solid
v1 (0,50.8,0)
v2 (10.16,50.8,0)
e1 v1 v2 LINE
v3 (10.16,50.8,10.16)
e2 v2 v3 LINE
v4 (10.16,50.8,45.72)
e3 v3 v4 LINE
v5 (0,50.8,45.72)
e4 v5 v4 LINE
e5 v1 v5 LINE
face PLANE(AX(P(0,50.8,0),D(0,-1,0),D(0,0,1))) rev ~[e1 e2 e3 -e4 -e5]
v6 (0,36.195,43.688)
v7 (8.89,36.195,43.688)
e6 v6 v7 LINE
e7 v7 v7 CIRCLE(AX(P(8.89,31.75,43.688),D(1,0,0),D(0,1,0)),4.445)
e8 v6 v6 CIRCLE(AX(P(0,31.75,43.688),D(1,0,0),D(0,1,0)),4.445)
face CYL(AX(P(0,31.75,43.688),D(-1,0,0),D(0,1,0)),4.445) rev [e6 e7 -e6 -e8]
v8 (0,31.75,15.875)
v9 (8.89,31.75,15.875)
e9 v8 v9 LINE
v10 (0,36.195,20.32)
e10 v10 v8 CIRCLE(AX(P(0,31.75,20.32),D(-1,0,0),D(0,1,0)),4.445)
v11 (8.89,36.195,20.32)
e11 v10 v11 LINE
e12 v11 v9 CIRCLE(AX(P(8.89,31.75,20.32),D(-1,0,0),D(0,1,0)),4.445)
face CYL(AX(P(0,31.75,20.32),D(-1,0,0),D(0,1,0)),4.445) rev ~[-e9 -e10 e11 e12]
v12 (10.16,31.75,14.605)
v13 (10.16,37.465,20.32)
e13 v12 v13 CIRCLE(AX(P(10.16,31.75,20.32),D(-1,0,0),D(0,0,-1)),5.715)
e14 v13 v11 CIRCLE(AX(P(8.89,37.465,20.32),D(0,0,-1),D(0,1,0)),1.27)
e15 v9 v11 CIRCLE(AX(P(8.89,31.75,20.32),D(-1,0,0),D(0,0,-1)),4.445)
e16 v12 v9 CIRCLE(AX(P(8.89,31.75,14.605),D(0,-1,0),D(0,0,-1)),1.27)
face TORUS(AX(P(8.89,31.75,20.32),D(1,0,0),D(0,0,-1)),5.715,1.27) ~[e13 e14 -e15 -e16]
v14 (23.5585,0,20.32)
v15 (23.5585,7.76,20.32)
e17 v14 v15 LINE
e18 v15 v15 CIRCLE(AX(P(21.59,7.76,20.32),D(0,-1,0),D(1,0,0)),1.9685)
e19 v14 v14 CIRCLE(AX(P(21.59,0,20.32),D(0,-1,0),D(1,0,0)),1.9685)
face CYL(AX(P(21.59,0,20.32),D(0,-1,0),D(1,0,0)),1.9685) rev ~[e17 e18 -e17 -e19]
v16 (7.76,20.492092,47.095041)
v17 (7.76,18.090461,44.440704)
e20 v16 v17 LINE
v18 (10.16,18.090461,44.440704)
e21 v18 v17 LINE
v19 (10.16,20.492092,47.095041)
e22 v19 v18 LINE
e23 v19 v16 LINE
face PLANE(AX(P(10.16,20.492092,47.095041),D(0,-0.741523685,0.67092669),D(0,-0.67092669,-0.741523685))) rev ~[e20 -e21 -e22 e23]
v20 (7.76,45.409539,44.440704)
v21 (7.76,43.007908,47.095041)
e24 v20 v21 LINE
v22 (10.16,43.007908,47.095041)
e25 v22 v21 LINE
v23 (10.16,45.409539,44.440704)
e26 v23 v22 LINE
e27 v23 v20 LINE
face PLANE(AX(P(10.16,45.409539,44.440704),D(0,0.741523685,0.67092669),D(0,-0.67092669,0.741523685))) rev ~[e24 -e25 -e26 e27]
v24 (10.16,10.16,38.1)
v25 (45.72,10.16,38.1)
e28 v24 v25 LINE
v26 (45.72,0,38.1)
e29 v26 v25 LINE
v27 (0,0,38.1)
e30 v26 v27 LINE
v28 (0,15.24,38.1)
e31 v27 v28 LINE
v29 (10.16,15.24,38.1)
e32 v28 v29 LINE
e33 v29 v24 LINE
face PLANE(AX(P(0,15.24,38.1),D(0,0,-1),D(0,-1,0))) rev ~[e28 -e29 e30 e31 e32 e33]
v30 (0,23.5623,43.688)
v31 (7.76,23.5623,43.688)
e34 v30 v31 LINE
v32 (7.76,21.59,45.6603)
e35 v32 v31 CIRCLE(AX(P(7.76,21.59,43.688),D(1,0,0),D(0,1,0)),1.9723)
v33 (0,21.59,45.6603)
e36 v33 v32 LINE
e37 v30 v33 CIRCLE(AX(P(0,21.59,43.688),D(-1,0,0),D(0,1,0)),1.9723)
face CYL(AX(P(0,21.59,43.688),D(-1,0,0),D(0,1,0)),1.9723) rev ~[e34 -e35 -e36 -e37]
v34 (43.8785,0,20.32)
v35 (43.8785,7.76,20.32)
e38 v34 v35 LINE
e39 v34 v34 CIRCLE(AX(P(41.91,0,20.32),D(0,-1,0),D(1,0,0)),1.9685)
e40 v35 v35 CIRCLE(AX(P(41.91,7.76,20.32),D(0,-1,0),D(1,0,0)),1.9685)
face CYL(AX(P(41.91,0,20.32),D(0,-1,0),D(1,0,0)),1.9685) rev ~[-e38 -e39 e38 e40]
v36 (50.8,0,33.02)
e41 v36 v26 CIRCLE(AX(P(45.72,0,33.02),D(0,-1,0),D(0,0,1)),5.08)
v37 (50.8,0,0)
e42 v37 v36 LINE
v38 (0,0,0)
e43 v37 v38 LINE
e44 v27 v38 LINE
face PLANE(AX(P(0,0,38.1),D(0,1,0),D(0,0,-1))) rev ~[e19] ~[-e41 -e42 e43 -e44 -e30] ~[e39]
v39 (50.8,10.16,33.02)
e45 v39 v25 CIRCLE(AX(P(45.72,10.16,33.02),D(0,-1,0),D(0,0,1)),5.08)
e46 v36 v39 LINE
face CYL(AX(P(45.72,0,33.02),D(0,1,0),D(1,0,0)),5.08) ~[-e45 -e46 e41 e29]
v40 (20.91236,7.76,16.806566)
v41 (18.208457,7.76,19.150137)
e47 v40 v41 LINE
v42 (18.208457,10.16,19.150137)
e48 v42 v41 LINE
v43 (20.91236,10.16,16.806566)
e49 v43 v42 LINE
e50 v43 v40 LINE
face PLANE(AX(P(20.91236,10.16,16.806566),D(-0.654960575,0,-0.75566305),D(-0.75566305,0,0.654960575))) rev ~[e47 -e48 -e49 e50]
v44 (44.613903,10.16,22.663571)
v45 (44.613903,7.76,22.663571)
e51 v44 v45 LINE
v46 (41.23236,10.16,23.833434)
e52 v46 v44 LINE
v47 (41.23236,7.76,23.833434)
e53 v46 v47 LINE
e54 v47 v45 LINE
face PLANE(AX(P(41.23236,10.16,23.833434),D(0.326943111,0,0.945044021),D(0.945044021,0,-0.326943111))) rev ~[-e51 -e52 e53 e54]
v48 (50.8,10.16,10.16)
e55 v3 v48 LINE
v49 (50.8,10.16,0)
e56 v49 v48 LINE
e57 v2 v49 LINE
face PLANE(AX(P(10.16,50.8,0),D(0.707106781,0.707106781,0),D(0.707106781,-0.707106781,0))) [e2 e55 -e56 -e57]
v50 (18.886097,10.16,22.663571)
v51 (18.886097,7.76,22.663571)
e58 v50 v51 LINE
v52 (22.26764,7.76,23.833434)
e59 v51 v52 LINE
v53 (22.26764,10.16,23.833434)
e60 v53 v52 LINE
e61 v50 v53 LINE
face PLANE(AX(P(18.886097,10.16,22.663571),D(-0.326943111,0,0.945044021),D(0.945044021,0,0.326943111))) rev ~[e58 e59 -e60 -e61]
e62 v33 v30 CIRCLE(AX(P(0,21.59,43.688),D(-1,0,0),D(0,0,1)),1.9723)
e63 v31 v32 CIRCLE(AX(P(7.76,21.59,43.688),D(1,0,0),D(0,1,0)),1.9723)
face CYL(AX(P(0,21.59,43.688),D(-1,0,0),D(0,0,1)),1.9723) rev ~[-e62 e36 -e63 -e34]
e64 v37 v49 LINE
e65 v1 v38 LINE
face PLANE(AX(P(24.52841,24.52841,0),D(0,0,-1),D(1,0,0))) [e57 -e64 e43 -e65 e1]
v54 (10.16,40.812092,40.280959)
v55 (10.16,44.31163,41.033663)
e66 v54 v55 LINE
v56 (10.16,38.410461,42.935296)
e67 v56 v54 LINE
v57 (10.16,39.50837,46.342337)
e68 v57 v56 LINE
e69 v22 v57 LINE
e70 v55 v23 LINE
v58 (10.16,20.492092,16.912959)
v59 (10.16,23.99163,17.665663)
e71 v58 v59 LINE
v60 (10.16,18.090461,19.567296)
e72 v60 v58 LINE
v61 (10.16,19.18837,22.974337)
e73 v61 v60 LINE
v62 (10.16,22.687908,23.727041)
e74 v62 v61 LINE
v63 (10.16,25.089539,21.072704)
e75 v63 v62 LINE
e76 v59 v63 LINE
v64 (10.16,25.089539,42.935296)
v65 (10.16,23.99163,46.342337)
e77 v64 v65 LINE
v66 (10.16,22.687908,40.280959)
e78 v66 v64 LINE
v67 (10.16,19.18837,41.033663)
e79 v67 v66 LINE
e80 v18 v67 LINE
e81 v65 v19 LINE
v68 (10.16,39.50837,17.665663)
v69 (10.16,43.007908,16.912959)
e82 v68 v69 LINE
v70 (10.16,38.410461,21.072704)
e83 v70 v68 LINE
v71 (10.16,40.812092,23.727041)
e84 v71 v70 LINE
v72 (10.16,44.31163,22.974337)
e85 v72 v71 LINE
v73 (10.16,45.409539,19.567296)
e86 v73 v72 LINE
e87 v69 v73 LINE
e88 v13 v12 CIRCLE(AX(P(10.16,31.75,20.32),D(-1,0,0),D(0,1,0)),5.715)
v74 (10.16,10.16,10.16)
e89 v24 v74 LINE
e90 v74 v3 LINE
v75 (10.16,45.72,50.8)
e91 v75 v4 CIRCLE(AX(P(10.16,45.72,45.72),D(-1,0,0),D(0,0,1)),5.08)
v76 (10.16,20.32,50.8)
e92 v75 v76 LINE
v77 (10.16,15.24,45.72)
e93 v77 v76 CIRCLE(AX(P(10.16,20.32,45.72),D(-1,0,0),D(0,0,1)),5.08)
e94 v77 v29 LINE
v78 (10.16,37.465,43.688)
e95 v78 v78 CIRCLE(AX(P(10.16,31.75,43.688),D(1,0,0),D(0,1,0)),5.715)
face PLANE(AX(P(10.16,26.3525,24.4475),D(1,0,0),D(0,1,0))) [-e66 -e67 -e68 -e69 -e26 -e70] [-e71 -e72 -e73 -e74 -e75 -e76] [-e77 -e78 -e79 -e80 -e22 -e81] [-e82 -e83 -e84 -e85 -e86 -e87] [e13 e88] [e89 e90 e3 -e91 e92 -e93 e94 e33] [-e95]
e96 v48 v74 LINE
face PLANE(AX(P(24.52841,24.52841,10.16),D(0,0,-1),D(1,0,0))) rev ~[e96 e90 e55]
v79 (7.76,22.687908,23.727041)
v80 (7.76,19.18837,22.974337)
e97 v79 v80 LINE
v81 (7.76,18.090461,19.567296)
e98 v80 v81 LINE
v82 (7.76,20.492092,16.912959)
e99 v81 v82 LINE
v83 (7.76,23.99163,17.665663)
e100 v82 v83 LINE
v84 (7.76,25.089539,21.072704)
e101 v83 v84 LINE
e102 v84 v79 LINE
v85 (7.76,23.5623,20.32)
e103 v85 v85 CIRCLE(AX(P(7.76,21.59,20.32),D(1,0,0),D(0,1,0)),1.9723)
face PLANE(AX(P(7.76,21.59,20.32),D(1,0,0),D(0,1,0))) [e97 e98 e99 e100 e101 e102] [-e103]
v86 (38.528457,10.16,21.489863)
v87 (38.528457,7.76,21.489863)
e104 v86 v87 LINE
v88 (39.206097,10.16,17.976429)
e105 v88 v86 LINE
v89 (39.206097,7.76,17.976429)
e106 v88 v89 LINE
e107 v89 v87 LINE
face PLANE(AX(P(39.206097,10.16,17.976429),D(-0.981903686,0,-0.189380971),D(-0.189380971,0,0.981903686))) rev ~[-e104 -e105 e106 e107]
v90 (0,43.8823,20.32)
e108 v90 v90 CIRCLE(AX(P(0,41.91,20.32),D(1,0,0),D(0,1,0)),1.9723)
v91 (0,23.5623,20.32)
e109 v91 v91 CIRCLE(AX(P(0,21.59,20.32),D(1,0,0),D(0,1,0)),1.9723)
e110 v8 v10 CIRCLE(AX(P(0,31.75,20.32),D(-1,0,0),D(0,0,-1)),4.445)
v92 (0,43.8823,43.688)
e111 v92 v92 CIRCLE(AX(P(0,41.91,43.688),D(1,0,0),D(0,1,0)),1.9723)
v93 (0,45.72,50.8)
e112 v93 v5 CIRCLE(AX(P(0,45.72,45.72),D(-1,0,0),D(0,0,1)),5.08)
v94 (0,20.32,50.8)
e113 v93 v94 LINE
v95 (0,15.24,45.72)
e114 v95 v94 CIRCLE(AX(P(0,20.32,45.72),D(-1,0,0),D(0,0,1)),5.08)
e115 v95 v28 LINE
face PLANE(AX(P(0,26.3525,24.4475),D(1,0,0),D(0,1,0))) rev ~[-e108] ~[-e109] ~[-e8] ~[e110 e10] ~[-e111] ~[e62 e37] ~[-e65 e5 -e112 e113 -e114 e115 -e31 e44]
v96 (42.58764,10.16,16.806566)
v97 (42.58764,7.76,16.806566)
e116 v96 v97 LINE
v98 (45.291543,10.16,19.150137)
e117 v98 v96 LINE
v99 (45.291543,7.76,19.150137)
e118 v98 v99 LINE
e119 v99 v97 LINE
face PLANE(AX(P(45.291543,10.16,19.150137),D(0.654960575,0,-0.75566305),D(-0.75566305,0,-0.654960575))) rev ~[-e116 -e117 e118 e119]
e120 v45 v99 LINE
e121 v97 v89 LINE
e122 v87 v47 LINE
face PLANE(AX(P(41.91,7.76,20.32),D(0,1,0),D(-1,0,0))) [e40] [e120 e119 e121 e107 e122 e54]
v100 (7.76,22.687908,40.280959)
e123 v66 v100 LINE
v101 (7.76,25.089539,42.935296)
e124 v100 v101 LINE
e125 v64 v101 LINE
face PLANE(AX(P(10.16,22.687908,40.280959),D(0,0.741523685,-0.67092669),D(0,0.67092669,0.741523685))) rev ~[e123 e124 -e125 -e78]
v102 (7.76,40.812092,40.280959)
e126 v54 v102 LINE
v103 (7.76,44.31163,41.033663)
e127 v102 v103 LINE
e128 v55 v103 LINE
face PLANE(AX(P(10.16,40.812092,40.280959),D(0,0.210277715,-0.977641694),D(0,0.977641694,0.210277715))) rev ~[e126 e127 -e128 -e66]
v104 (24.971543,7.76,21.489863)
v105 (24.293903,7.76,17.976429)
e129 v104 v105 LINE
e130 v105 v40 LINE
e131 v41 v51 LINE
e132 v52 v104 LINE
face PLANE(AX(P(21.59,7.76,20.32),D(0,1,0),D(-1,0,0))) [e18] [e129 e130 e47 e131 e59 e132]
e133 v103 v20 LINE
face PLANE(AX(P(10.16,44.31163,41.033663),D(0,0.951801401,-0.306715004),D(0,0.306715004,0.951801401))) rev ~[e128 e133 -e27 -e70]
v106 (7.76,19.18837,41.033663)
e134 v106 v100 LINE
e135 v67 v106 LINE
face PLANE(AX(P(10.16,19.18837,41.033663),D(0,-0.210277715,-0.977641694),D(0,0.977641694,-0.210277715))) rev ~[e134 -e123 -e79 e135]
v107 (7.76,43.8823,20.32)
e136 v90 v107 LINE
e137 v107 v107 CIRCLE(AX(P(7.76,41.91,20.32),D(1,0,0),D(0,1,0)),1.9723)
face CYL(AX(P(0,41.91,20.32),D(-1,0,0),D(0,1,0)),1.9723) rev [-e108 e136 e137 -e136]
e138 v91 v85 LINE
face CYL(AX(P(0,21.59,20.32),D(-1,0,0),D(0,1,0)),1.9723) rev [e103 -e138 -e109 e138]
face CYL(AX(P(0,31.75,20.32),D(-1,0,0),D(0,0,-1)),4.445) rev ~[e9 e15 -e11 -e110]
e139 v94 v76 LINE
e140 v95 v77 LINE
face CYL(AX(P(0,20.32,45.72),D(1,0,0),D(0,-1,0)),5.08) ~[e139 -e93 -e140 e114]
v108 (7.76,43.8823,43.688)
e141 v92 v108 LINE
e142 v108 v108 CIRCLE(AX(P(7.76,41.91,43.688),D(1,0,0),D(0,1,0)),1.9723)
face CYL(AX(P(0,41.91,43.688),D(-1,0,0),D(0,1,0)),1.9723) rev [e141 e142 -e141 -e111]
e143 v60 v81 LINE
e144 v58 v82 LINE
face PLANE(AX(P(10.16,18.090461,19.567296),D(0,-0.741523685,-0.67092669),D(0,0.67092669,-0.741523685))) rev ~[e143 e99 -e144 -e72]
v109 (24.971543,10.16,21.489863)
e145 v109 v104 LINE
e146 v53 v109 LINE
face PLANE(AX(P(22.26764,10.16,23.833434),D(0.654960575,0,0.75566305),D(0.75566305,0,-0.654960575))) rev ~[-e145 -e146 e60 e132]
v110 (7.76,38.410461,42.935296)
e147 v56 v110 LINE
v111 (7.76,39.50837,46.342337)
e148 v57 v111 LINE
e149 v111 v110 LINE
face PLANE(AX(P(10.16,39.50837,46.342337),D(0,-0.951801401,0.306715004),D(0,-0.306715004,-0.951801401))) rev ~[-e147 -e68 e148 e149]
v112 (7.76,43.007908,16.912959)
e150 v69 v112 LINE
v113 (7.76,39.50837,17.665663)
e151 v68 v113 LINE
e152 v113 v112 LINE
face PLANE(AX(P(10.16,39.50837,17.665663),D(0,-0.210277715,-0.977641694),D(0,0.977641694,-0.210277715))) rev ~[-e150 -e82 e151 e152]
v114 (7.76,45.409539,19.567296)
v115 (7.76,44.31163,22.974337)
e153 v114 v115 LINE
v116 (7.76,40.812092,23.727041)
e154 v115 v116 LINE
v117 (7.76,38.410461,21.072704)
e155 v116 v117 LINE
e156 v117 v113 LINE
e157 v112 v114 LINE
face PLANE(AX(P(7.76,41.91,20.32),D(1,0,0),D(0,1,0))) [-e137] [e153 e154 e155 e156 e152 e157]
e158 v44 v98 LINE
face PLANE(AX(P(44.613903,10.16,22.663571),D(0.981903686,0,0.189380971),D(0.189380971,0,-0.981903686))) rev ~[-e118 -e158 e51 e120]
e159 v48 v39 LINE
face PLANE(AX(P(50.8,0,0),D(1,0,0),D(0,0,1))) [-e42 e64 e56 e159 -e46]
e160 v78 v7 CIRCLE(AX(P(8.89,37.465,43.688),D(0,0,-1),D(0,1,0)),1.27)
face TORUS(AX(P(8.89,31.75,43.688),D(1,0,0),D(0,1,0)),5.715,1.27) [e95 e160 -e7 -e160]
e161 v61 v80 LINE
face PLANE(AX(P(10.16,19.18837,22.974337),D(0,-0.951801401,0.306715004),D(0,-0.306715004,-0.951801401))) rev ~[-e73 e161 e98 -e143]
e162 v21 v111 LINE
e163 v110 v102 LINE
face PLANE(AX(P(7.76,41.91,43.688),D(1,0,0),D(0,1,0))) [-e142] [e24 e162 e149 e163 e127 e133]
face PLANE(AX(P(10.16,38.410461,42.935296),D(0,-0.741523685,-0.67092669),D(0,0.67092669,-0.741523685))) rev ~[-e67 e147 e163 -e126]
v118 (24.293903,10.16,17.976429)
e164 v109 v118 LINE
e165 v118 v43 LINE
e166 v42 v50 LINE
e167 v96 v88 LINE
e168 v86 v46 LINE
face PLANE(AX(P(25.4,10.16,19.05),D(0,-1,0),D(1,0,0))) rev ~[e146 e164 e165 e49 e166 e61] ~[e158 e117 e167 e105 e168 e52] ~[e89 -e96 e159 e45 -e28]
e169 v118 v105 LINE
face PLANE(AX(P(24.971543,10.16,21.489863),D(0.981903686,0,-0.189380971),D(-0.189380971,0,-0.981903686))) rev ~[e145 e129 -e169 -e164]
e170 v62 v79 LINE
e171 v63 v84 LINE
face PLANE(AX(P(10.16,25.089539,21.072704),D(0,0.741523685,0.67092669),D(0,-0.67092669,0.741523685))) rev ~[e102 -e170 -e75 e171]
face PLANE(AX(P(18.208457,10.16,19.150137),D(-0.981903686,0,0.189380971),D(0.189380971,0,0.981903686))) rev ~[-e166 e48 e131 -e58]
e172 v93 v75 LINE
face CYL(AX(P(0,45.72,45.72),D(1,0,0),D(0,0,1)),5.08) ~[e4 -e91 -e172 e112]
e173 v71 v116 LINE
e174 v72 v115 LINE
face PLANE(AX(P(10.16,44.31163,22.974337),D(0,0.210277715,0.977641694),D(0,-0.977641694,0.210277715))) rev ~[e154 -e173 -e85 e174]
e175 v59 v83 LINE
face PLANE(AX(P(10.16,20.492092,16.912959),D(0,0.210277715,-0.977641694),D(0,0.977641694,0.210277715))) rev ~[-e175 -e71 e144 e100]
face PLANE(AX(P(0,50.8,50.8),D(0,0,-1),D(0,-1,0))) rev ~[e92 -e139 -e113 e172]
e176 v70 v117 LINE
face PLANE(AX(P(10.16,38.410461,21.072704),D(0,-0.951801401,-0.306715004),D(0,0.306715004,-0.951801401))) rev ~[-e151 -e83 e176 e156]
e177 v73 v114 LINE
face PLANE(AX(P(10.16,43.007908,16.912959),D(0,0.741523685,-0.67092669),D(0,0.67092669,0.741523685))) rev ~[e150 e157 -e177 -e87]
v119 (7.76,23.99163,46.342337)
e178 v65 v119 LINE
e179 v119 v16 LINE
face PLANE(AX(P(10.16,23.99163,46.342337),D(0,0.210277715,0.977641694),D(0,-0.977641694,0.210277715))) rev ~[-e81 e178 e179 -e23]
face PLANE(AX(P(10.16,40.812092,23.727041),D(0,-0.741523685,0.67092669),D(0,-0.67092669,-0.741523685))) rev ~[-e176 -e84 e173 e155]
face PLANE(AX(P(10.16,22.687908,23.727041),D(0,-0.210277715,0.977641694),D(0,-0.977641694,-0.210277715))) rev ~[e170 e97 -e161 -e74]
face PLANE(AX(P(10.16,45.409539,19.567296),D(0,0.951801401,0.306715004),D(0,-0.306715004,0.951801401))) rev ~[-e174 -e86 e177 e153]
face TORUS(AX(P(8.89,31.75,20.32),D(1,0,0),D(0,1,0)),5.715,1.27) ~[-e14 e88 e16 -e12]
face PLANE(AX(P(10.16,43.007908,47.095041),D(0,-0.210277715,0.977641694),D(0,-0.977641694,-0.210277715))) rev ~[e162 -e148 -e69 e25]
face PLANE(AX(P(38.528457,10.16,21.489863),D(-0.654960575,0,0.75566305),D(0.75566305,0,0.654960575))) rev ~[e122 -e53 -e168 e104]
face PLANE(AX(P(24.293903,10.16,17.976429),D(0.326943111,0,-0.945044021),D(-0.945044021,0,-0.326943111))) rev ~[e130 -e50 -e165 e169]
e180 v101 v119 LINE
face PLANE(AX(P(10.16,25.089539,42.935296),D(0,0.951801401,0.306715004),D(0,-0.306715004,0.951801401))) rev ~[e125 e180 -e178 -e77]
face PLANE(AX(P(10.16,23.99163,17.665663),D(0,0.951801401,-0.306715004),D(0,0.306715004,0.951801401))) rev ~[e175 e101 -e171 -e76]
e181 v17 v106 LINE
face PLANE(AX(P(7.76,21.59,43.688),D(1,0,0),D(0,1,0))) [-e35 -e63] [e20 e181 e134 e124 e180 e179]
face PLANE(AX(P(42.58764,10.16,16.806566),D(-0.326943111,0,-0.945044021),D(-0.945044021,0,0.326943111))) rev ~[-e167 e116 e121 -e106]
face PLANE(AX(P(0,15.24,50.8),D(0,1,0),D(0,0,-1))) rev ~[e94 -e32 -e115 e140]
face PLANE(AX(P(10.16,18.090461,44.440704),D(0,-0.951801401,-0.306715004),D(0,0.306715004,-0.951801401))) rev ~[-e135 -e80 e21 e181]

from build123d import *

# Parameters (mm, degrees)
F0_R      = 1.9722998741
F0_R_2    = 4.445
F1_DEPTH  = 10.16
F2_R      = 1.9722998741
F3_DEPTH  = 2.4
F4_R      = 5.08
F5_W      = 50.8
F5_H      = 38.1
F5_R      = 1.9685
F6_DEPTH  = 10.16
F7_R      = 5.08
F8_R      = 1.9685
F9_DEPTH  = 2.4
F11_DEPTH = 10.16
F12_R     = 1.27


# Not quite as in the source:
# - a feature names something its author has since deleted; it is built from what else it names


with BuildPart() as f1:
    # F0 (on Right) → F1 (new body)
    with BuildSketch(Plane.YZ):
        Polygon((15.24, 38.1), (0, 38.1), (0, 0), (31.75, 0), (50.8, 0), (50.8, 50.8), (31.75, 50.8), (21.59, 50.8), (15.24, 50.8), align=None)
        with Locations((21.59, 20.32)):
            Circle(F0_R, mode=Mode.SUBTRACT)
        with BuildLine():
            ThreePointArc((36.195, 20.32), (34.8930896424, 17.1769103576), (31.75, 15.875))
            ThreePointArc((31.75, 15.875), (28.6069103576, 23.4630896424), (36.195, 20.32))
        make_face(mode=Mode.SUBTRACT)
        with Locations((41.91, 20.32)):
            Circle(F0_R, mode=Mode.SUBTRACT)
        with BuildLine():
            ThreePointArc((23.5622998741, 43.688), (20.1953733845, 42.2933733845), (21.59, 45.6602998741))
            ThreePointArc((21.59, 45.6602998741), (22.9846266155, 45.0826266155), (23.5622998741, 43.688))
        make_face(mode=Mode.SUBTRACT)
        with Locations((31.75, 43.688)):
            Circle(F0_R_2, mode=Mode.SUBTRACT)
        with Locations((41.91, 43.688)):
            Circle(F0_R, mode=Mode.SUBTRACT)
    extrude(amount=F1_DEPTH)

    # F2 (on face) → F3 (cut)
    with BuildSketch(Plane.YZ.offset(10.16)):
        Polygon((20.4920916615, 47.0950413284), (18.0904614886, 44.440704152), (19.1883698271, 41.0336628236), (22.6879083385, 40.2809586716), (25.0895385114, 42.935295848), (23.9916301729, 46.3423371764), align=None)
        with Locations((21.59, 43.688)):
            Circle(F2_R, mode=Mode.SUBTRACT)
        Polygon((40.8120916615, 40.2809586716), (44.3116301729, 41.0336628236), (45.4095385114, 44.440704152), (43.0079083385, 47.0950413284), (39.5083698271, 46.3423371764), (38.4104614886, 42.935295848), align=None)
        with Locations((41.91, 43.688)):
            Circle(F2_R, mode=Mode.SUBTRACT)
        Polygon((44.3116301729, 22.9743371764), (40.8120916615, 23.7270413284), (38.4104614886, 21.072704152), (39.5083698271, 17.6656628236), (43.0079083385, 16.9129586716), (45.4095385114, 19.567295848), align=None)
        with Locations((41.91, 20.32)):
            Circle(F2_R, mode=Mode.SUBTRACT)
        Polygon((22.6879083385, 23.7270413284), (19.1883698271, 22.9743371764), (18.0904614886, 19.567295848), (20.4920916615, 16.9129586716), (23.9916301729, 17.6656628236), (25.0895385114, 21.072704152), align=None)
        with Locations((21.59, 20.32)):
            Circle(F2_R, mode=Mode.SUBTRACT)
    extrude(amount=-F3_DEPTH, mode=Mode.SUBTRACT)

    # F4
    f4_edges = [f1.edges().sort_by_distance(p)[0] for p in [
        (5.08, 50.8, 50.8),
        (5.08, 15.24, 50.8),
    ]]
    fillet(f4_edges, radius=F4_R)

    # F5 (on Front) → F6 (join)
    with BuildSketch(Plane.XZ):
        with Locations((25.4, 19.05)):
            Rectangle(F5_W, F5_H)
        with Locations((21.59, 20.32)):
            Circle(F5_R, mode=Mode.SUBTRACT)
        with Locations((41.91, 20.32)):
            Circle(F5_R, mode=Mode.SUBTRACT)
    extrude(amount=-F6_DEPTH)

    # F7
    f7_edges = [f1.edges().sort_by_distance(p)[0] for p in [
        (50.8, 5.08, 38.1),
    ]]
    fillet(f7_edges, radius=F7_R)

    # F8 (on face) → F9 (cut)
    with BuildSketch(Plane(origin=(0, 10.16, 0), x_dir=(-1, 0, 0), z_dir=(0, 1, 0))):
        Polygon((-41.2323596559, 23.8334340491), (-44.613902969, 22.6635707772), (-45.2915433131, 19.1501367281), (-42.5876403441, 16.8065659509), (-39.206097031, 17.9764292228), (-38.5284566869, 21.4898632719), align=None)
        with Locations((-41.91, 20.32)):
            Circle(F8_R, mode=Mode.SUBTRACT)
        Polygon((-24.293902969, 17.9764292228), (-20.9123596559, 16.8065659509), (-18.2084566869, 19.1501367281), (-18.886097031, 22.6635707772), (-22.2676403441, 23.8334340491), (-24.9715433131, 21.4898632719), align=None)
        with Locations((-21.59, 20.32)):
            Circle(F8_R, mode=Mode.SUBTRACT)
    extrude(amount=-F9_DEPTH, mode=Mode.SUBTRACT)

    # F10 (on face) → F11 (join)
    with BuildSketch(Plane(origin=(0, 0, 0), x_dir=(1, 0, 0), z_dir=(0, 0, -1))):
        Polygon((10.16, -10.16), (10.16, -50.8), (50.8, -10.16), align=None)
    extrude(amount=-F11_DEPTH)

    # F12
    f12_edges = [f1.edges().sort_by_distance(p)[0] for p in [
        (10.16, 27.305, 20.32),
        (10.16, 27.305, 43.688),
    ]]
    fillet(f12_edges, radius=F12_R)


solid = f1.part
